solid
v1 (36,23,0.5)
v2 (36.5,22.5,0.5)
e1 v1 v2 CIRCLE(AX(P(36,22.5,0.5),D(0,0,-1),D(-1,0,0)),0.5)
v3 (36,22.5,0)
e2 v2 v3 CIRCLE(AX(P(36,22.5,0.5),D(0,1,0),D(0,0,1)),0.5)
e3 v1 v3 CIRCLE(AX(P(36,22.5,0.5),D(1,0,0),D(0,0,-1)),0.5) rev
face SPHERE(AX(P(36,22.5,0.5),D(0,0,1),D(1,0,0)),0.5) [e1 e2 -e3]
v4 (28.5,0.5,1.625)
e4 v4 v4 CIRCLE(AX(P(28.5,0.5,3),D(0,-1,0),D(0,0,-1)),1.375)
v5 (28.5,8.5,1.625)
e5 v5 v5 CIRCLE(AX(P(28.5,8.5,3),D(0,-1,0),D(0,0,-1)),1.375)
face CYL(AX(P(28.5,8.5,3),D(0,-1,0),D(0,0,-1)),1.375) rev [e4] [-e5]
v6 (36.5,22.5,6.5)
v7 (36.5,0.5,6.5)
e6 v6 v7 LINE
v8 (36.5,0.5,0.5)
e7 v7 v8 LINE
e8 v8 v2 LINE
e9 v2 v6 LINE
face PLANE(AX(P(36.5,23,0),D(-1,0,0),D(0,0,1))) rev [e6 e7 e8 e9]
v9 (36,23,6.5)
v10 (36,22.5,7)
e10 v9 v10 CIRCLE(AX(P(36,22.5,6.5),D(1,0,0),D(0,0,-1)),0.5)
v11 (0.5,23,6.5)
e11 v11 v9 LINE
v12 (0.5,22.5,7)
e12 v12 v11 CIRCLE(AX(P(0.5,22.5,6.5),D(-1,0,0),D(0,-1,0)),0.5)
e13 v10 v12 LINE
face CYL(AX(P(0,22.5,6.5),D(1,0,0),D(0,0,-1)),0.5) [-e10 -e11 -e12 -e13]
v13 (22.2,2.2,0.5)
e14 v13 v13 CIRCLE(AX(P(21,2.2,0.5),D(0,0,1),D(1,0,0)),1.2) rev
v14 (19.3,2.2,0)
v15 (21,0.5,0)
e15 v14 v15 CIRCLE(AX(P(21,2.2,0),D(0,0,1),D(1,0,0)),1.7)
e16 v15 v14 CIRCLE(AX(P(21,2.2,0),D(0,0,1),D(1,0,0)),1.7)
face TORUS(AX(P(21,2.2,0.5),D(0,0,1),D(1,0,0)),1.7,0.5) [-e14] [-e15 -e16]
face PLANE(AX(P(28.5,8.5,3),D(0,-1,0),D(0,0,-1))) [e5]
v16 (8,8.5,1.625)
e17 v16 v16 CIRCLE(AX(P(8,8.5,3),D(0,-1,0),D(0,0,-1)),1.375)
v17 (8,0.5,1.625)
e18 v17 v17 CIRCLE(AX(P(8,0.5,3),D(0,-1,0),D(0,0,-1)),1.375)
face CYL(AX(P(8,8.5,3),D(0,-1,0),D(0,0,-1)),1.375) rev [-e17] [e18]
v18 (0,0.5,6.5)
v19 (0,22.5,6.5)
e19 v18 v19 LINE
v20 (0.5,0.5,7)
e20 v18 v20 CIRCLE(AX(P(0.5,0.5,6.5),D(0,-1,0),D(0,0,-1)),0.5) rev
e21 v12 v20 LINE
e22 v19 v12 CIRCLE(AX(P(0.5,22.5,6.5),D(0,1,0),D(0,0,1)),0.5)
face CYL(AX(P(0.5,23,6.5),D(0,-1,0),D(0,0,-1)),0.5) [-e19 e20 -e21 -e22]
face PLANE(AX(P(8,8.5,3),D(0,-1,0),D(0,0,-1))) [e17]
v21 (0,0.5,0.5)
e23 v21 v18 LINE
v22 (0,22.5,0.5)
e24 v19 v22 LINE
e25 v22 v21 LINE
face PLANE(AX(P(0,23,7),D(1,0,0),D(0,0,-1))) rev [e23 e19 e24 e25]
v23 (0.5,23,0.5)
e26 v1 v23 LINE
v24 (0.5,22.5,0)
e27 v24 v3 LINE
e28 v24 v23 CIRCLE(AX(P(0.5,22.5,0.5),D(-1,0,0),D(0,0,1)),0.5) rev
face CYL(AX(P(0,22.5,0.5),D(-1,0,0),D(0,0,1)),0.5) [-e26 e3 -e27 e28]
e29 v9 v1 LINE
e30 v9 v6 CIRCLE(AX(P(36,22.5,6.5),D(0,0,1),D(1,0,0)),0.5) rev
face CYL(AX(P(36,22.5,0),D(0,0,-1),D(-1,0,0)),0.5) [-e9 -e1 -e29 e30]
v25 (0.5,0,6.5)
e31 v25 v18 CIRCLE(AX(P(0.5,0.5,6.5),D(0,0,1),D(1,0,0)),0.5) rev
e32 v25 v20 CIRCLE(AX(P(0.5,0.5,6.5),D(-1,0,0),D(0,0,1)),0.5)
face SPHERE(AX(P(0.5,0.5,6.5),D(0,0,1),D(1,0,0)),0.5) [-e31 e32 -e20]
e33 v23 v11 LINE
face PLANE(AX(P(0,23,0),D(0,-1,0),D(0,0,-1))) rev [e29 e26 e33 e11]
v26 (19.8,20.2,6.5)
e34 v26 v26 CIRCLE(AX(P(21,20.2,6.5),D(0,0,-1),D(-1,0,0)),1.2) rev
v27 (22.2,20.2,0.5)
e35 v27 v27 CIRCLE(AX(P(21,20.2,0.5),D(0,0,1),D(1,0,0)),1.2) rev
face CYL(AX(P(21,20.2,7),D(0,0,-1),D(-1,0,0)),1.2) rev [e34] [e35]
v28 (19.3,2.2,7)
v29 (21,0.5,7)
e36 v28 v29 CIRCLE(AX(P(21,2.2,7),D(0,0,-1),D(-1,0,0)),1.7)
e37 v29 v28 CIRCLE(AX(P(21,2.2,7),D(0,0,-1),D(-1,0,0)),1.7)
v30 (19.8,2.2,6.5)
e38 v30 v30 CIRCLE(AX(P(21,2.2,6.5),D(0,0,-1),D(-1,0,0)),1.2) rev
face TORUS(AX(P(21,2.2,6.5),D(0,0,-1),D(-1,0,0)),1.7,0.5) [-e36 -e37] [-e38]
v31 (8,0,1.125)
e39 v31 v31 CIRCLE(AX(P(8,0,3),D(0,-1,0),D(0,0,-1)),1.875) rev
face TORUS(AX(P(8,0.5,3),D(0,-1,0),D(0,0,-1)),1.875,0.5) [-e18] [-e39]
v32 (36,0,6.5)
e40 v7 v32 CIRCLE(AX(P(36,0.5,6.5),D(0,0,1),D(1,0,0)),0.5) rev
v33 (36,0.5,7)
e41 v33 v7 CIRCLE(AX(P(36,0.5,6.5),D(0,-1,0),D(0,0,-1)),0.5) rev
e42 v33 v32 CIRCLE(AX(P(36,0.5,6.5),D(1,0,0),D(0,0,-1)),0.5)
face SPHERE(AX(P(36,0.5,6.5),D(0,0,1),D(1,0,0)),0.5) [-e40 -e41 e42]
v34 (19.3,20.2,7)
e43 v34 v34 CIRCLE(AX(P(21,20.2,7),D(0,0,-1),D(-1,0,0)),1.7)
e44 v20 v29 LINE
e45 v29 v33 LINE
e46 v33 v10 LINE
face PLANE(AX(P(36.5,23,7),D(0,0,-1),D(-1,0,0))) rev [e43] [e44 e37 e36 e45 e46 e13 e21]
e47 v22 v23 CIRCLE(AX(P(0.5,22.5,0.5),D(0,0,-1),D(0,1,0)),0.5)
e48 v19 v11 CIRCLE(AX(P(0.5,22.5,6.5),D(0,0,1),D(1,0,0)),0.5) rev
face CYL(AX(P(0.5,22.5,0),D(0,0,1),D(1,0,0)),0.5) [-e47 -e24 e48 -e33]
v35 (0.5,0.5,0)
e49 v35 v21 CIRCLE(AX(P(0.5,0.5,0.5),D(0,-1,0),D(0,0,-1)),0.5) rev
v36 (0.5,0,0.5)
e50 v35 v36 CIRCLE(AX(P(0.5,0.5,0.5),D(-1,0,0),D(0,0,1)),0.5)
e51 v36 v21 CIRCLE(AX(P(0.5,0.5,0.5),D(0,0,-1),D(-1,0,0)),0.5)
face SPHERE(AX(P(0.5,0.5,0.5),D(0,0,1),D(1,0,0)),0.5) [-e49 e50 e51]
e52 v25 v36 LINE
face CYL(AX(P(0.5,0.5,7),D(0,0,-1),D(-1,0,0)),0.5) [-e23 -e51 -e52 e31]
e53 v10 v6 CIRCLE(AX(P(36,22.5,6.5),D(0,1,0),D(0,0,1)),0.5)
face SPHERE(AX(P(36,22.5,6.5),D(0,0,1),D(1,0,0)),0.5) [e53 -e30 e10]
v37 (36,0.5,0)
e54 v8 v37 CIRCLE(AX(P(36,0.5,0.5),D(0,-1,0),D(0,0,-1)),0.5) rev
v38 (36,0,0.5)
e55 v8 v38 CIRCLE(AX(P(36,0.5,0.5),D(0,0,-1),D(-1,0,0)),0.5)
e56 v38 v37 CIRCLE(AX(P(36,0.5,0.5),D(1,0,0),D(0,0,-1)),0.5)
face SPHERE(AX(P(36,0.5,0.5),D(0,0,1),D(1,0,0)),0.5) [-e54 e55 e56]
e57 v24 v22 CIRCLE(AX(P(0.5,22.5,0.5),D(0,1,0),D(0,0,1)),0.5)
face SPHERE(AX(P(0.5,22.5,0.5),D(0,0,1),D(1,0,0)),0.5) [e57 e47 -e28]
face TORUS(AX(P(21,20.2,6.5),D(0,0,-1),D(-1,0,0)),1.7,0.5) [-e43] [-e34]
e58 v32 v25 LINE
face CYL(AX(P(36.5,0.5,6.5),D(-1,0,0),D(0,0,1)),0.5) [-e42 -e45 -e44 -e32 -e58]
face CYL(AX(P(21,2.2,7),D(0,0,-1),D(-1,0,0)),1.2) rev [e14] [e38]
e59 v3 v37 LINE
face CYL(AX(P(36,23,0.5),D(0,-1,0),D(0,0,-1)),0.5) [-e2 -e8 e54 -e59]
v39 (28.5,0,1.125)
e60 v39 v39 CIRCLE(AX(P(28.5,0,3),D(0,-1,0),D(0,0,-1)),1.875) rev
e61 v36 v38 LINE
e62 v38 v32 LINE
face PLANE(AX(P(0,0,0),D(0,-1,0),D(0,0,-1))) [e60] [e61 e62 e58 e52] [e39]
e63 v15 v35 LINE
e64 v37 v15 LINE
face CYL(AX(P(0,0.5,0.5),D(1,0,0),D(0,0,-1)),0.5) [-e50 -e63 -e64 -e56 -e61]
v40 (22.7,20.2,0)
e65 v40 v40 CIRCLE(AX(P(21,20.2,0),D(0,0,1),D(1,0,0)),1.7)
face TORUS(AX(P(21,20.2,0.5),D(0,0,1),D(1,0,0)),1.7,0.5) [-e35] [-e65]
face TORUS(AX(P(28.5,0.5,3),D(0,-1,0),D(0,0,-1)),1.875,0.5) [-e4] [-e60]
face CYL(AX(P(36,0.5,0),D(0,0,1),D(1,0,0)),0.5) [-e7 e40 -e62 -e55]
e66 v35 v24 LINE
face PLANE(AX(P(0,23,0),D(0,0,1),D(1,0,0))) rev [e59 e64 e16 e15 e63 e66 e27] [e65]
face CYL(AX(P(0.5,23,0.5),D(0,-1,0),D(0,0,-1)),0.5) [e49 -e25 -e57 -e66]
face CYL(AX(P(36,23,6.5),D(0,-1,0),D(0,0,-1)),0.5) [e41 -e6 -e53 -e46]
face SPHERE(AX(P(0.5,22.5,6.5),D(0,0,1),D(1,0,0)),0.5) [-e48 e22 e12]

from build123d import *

# Parameters (mm, degrees)
SKETCH1_W           = 36.5
SKETCH1_H           = 7
BOSS_EXTRUDE1_DEPTH = 23
SKETCH2_R           = 1.375
CUT_EXTRUDE1_DEPTH  = 8.5
SKETCH4_R           = 1.2
CUT_EXTRUDE2_DEPTH  = 7
FILLET1_R           = 0.5


with BuildPart() as part:
    # Sketch1 → Boss-Extrude1 (new body)
    with BuildSketch(Plane(origin=(0, 0, 0), x_dir=(1, 0, 0), z_dir=(0, 1, 0))):
        with Locations((18.25, -3.5)):
            Rectangle(SKETCH1_W, SKETCH1_H)
    extrude(amount=BOSS_EXTRUDE1_DEPTH)

    # Sketch2 → Cut-Extrude1 (cut)
    with BuildSketch(Plane.XZ):
        with Locations(Location((8, 3, 0), (0, 0, 270))):
            Circle(SKETCH2_R)
        with Locations(Location((28.5, 3, 0), (0, 0, 270))):
            Circle(SKETCH2_R)
    extrude(amount=-CUT_EXTRUDE1_DEPTH, mode=Mode.SUBTRACT)

    # Sketch4 → Cut-Extrude2 (cut)
    with BuildSketch(Plane(origin=(0, 0, 0), x_dir=(-1, 0, 0), z_dir=(0, 0, -1))):
        with Locations((-21, 2.2)):
            Circle(SKETCH4_R)
        with Locations((-21, 20.2)):
            Circle(SKETCH4_R)
    extrude(amount=-CUT_EXTRUDE2_DEPTH, mode=Mode.SUBTRACT)

    # Fillet1
    fillet1_edges = [part.edges().sort_by_distance(p)[0] for p in [
        (36.5, 23, 3.5),
        (8, 0, 4.375),
        (18.25, 23, 0),
        (28.5, 0, 4.375),
        (22.2, 2.2, 7),
        (22.2, 2.2, 0),
        (22.2, 20.2, 7),
        (22.2, 20.2, 0),
        (0, 23, 3.5),
        (18.25, 0, 0),
        (36.5, 0, 3.5),
        (18.25, 0, 7),
        (0, 0, 3.5),
        (0, 11.5, 0),
        (36.5, 11.5, 0),
        (36.5, 11.5, 7),
        (0, 11.5, 7),
        (18.25, 23, 7),
    ]]
    fillet(fillet1_edges, radius=FILLET1_R - 0.0001)  # a hair under: the kernel refuses the full size


solid = part.part
